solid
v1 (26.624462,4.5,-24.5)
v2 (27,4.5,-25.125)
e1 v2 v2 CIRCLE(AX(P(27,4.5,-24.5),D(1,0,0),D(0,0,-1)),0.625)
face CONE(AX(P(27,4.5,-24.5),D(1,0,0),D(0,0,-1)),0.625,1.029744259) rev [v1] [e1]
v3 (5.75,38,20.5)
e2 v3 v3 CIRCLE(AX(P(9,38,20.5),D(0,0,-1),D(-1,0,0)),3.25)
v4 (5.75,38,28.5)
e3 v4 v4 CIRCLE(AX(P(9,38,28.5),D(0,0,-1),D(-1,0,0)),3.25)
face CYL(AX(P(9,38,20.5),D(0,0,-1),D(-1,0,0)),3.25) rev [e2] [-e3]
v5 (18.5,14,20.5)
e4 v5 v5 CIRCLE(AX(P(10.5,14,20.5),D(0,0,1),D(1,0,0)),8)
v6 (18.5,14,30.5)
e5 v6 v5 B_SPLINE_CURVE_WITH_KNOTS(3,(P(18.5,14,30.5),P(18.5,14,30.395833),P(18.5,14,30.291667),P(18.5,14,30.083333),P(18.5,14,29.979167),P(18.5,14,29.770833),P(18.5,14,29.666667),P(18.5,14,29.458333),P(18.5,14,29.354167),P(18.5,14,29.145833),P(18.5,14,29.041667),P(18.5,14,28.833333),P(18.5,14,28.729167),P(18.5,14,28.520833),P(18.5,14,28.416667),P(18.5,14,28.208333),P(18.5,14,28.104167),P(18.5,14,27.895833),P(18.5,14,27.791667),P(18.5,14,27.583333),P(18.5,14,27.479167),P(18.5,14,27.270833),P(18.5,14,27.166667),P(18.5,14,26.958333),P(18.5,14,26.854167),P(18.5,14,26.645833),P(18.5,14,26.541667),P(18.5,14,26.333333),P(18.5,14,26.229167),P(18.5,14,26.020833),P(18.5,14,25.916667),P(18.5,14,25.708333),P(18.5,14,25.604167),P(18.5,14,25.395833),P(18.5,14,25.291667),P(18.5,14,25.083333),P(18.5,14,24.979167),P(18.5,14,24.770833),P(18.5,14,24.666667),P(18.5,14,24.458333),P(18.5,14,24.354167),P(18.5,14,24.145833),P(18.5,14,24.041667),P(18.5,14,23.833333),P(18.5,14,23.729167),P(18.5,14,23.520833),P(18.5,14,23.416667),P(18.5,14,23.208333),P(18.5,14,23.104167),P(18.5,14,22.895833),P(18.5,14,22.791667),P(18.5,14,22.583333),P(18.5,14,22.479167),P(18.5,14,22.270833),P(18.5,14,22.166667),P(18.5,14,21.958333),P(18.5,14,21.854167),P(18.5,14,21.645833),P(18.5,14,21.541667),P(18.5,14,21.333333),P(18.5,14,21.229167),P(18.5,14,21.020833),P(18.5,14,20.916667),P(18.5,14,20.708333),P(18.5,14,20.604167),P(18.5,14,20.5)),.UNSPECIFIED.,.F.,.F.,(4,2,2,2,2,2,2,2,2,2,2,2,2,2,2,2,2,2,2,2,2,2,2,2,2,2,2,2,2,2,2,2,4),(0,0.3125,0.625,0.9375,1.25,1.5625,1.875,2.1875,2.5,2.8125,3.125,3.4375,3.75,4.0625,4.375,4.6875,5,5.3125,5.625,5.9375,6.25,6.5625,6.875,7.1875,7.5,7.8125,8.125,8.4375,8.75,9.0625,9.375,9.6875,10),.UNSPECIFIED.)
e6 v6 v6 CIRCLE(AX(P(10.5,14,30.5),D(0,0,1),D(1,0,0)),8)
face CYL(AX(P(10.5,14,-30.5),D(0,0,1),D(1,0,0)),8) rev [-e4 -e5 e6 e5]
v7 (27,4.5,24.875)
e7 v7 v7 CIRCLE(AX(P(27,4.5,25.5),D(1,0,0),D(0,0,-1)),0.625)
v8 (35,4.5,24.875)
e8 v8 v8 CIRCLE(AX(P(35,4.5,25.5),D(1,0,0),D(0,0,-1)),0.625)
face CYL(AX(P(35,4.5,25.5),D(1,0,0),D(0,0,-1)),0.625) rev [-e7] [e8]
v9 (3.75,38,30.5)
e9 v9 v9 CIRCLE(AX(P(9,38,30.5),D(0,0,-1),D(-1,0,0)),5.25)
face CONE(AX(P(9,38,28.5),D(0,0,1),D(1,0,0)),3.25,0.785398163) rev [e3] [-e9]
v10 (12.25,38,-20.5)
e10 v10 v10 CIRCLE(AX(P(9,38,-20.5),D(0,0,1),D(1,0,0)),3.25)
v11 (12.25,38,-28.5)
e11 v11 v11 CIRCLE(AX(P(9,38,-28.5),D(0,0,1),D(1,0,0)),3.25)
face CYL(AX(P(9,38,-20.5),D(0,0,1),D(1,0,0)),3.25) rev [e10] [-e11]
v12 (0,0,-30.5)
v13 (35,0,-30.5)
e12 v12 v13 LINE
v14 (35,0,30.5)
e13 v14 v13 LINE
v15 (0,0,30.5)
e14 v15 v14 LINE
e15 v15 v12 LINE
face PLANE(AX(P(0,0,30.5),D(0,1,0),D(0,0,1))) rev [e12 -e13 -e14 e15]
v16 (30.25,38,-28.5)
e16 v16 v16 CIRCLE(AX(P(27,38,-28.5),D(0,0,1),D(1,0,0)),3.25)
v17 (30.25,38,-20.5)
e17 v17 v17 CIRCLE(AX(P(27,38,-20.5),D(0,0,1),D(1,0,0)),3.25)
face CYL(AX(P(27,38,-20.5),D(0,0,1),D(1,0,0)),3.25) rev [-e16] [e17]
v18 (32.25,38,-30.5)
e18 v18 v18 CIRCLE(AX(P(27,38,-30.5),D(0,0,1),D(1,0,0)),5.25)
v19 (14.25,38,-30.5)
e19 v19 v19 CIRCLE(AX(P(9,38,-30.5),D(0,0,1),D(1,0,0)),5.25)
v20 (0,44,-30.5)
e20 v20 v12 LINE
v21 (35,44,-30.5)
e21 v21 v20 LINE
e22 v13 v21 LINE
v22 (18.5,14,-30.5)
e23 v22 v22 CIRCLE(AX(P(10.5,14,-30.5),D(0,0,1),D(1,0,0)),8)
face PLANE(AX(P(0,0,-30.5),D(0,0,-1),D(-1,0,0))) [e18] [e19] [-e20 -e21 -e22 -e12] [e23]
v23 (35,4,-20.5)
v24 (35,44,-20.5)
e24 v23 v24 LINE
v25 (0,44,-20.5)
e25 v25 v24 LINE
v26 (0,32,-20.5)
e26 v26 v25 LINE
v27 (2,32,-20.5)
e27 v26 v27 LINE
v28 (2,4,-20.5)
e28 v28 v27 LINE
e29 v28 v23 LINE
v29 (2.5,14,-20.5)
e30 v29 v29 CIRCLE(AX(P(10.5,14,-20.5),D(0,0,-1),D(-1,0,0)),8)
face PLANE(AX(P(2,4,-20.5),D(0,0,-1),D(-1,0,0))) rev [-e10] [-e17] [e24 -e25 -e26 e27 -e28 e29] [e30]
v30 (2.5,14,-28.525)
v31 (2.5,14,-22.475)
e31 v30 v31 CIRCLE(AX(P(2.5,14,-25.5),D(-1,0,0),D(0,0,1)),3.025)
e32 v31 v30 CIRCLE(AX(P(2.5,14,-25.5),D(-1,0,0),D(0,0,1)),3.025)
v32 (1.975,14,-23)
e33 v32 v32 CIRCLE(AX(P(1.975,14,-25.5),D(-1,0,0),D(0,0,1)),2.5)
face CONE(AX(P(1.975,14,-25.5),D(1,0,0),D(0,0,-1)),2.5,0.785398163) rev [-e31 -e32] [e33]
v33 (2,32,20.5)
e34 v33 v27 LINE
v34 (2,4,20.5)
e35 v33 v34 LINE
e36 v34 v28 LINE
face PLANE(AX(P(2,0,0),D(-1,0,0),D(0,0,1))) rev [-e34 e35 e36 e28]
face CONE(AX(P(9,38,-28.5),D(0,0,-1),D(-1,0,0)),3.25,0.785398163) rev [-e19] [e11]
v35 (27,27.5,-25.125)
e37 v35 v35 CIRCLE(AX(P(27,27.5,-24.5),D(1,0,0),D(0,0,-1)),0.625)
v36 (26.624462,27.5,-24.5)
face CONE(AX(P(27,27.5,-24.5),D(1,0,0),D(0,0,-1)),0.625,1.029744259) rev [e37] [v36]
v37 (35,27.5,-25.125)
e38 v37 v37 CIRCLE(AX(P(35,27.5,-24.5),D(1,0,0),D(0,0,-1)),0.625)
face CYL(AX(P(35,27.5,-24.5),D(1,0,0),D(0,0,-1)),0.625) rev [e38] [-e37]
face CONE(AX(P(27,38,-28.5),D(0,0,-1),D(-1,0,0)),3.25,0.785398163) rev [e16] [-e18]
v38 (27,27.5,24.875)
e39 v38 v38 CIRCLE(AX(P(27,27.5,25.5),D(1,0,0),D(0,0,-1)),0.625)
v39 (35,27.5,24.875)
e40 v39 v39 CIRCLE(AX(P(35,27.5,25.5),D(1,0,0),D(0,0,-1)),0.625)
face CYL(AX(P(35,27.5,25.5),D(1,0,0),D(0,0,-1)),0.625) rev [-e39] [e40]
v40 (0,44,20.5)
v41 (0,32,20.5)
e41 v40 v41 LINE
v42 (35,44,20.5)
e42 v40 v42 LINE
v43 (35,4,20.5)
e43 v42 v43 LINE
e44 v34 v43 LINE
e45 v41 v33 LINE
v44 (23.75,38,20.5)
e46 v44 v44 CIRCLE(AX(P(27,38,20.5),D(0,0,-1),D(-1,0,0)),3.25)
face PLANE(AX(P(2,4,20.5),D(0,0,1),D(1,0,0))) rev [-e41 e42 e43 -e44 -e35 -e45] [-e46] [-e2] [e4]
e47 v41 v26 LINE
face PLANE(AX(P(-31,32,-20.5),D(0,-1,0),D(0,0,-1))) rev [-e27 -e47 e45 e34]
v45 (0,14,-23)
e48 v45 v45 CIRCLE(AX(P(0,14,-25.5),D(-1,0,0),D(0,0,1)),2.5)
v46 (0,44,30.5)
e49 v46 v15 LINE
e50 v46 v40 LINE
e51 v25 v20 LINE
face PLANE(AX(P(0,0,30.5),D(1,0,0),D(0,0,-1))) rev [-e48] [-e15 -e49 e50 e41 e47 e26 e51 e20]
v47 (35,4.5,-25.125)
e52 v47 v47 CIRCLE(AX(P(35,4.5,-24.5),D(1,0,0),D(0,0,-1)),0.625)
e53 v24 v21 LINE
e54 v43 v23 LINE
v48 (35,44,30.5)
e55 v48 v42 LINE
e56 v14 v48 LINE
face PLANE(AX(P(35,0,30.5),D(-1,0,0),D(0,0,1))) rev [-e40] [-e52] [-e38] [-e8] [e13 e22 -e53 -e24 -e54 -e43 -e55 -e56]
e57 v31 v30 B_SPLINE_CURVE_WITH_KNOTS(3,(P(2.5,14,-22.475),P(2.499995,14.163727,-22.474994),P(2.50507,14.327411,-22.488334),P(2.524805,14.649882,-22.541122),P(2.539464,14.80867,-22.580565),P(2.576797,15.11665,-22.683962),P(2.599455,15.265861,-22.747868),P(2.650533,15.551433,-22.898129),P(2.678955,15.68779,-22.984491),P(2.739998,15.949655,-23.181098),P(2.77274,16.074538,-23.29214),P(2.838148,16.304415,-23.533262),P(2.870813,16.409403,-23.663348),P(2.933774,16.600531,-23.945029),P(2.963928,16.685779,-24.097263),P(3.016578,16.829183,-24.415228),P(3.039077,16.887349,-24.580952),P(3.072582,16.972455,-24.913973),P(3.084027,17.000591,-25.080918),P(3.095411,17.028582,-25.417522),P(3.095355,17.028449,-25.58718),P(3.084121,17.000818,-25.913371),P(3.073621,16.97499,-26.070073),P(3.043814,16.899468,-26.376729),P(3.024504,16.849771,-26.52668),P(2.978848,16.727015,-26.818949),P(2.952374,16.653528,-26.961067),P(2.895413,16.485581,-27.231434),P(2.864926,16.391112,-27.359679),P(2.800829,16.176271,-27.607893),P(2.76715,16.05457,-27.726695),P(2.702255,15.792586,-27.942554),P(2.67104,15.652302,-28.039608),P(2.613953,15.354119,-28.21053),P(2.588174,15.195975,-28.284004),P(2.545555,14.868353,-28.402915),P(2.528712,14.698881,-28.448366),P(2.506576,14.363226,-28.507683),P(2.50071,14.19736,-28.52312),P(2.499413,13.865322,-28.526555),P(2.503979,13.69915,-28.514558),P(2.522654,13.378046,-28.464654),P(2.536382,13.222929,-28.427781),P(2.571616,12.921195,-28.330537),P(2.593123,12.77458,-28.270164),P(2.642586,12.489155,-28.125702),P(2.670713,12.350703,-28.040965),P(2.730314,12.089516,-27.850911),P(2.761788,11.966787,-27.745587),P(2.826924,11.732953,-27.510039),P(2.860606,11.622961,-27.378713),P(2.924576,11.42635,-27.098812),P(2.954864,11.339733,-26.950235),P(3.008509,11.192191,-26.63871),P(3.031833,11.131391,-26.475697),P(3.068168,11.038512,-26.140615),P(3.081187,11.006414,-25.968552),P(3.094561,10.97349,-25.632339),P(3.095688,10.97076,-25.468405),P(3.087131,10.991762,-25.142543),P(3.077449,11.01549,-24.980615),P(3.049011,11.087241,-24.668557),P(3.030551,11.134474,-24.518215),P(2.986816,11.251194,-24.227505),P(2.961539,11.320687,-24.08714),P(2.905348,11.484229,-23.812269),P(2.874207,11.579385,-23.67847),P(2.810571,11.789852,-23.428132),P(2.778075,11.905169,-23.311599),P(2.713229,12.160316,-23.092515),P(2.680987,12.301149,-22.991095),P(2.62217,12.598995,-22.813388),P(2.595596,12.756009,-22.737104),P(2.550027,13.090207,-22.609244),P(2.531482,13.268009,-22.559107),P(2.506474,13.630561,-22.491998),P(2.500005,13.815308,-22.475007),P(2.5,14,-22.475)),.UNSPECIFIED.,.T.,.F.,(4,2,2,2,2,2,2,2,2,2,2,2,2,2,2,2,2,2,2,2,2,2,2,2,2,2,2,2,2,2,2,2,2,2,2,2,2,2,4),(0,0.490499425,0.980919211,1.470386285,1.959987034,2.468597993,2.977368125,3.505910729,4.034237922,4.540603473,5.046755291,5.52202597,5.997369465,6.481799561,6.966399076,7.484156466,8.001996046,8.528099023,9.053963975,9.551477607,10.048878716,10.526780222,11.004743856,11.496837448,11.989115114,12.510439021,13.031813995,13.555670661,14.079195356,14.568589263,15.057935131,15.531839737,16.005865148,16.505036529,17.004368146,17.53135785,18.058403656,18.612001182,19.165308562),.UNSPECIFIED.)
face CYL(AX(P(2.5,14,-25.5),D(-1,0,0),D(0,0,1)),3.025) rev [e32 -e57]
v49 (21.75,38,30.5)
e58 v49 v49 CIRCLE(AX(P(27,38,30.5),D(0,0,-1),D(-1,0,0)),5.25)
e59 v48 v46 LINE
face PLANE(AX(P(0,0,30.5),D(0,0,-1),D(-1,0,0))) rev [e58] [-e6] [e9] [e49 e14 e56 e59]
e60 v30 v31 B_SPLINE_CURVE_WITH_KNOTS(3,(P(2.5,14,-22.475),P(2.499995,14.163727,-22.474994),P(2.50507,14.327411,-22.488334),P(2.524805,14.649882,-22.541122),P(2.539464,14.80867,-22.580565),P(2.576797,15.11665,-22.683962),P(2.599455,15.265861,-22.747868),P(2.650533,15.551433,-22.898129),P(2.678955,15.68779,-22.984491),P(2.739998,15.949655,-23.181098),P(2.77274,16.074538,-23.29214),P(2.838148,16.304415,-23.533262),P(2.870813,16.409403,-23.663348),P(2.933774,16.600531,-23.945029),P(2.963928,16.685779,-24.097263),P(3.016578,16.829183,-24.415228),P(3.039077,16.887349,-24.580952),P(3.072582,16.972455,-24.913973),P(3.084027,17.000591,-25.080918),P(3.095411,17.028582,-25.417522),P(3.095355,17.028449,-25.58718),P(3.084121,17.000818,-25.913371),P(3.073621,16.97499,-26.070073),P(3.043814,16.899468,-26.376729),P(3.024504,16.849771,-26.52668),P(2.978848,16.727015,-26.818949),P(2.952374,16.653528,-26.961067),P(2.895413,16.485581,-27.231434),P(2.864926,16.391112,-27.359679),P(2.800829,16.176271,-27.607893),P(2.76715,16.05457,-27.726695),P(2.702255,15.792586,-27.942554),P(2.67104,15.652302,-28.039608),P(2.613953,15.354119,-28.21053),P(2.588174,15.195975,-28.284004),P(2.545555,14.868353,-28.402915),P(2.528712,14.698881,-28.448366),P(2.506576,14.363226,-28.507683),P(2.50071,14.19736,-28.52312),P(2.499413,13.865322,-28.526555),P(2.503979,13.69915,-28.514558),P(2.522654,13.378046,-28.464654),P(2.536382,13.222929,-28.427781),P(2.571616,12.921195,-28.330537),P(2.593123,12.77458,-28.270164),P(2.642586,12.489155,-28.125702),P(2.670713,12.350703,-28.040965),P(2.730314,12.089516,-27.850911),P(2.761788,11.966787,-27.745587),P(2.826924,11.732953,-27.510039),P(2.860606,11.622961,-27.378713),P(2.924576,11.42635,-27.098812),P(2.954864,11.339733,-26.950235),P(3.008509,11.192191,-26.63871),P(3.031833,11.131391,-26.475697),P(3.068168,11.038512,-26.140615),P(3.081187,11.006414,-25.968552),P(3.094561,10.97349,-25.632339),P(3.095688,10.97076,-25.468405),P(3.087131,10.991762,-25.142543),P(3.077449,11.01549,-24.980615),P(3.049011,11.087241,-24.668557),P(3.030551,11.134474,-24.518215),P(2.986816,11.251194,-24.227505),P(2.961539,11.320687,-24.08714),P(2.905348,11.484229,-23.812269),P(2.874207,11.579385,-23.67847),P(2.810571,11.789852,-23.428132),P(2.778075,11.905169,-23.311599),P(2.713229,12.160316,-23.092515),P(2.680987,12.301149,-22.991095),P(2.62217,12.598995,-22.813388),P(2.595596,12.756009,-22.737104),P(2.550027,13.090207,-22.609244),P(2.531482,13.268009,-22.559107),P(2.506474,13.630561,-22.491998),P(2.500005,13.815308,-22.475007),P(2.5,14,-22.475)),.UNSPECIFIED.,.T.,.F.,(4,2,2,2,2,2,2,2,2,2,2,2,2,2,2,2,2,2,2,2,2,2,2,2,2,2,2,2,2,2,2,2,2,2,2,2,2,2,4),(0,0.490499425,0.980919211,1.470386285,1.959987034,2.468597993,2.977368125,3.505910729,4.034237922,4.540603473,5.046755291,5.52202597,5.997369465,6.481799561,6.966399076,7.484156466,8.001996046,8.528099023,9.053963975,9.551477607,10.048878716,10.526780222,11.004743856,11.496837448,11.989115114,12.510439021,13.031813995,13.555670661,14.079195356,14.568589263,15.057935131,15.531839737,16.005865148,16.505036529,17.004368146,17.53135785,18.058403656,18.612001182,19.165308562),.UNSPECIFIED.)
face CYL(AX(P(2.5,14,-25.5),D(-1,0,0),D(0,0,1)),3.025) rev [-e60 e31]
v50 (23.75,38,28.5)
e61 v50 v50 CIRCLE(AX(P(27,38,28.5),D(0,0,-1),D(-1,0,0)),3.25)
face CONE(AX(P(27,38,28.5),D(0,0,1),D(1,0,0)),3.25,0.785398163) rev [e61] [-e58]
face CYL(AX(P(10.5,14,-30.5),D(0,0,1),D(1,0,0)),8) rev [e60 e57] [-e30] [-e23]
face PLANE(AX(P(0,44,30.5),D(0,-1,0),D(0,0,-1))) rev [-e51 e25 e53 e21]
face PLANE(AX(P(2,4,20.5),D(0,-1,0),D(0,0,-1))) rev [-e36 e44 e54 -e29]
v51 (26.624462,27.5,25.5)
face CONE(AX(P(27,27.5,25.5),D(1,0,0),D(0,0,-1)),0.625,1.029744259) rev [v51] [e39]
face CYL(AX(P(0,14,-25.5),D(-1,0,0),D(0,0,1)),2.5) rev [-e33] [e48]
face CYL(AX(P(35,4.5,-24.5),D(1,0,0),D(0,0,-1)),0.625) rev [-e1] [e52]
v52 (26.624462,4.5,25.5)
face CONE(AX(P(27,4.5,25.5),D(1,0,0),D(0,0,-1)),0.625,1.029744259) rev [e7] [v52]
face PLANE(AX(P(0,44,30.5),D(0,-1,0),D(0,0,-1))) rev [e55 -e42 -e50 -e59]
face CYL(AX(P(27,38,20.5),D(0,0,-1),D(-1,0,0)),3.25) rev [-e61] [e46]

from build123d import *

# Parameters (mm, degrees)
SKETCH_1_W                       = 35
SKETCH_1_H                       = 44
EXTRUDE_1_DEPTH                  = 30.5
SKETCH_3_W                       = 41
SKETCH_3_H                       = 40
CUT_EXTRUDE_1_DEPTH              = 33
SKETCH_4_W                       = 41
SKETCH_4_H                       = 12
CUT_EXTRUDE_2_DEPTH              = 33
SKETCH_5_R                       = 8
CUT_EXTRUDE_3_DEPTH              = 83.957820608
HOLE_WIZARD_6_5_6_5_1_AT_2_COUNT = 2
HOLE_WIZARD_6_5_6_5_1_AT_2_PITCH = 18


# Read off the part's stored shape, not the designer's step: M1.6 螺纹孔1, M6 螺纹孔1
with BuildPart() as part:
    # 草图1 → 凸台-拉伸1 (new, symmetric)
    with BuildSketch(Plane.XY):
        with Locations((17.5, 22)):
            Rectangle(SKETCH_1_W, SKETCH_1_H)
    extrude(amount=EXTRUDE_1_DEPTH, both=True)

    # 草图3 → 切除-拉伸1 (cut)
    with BuildSketch(Plane(origin=(35, 0, 0), x_dir=(0, 0, -1), z_dir=(1, 0, 0))):
        with Locations((0, 24)):
            Rectangle(SKETCH_3_W, SKETCH_3_H)
    extrude(amount=-CUT_EXTRUDE_1_DEPTH, mode=Mode.SUBTRACT)

    # 草图4 → 切除-拉伸2 (cut)
    with BuildSketch(Plane(origin=(2, 0, 0), x_dir=(0, 0, -1), z_dir=(1, 0, 0))):
        with Locations((0, 38)):
            Rectangle(SKETCH_4_W, SKETCH_4_H)
    extrude(amount=-CUT_EXTRUDE_2_DEPTH, mode=Mode.SUBTRACT)

    # 草图5 → 切除-拉伸3 (cut, through all)
    with BuildSketch(Plane.XY.offset(30.5)):
        with Locations((10.5, 14)):
            Circle(SKETCH_5_R)
    extrude(amount=-CUT_EXTRUDE_3_DEPTH, mode=Mode.SUBTRACT)

    # 草图7 → Ø6.5 (6.5) 直径孔1 (revolve, cut)
    with BuildSketch(Plane(origin=(9, 38, -20.5), x_dir=(0, -1, 0), z_dir=(1, 0, 0))):
        Polygon((0, 0), (0, 10), (5.25, 10), (3.25, 8), (3.25, 0), align=None)
    hole_wizard_6_5_6_5_1 = revolve(axis=Axis((9, 38, -14.15), (0, 0, -1)), mode=Mode.SUBTRACT)

    # Ø6.5 (6.5) 直径孔1 at 2: Ø6.5 (6.5) 直径孔1 ×2
    with Locations(*[(i * HOLE_WIZARD_6_5_6_5_1_AT_2_PITCH, 0, 0) for i in range(1, HOLE_WIZARD_6_5_6_5_1_AT_2_COUNT)]):
        add(hole_wizard_6_5_6_5_1, mode=Mode.SUBTRACT)

    # 镜向1: Ø6.5 (6.5) 直径孔1 across plane
    add(hole_wizard_6_5_6_5_1.mirror(Plane.XY), mode=Mode.SUBTRACT)

    # 镜向1 copy 1 sketch → 镜向1 copy 1 (revolve, cut)
    with BuildSketch(Plane(origin=(27, 38, 20.5), x_dir=(0, -1, 0), z_dir=(1, 0, 0))):
        Polygon((0, 0), (0, -10), (5.25, -10), (3.25, -8), (3.25, 0), align=None)
    revolve(axis=Axis((27, 38, 14.15), (0, 0, -1)), mode=Mode.SUBTRACT)

    # M1.6 螺纹孔1 outline → M1.6 螺纹孔1 (revolve, cut)
    with BuildSketch(Plane(origin=(0, 27.5, 25.5), x_dir=(0, 1, 0), z_dir=(0, 0, -1))):
        Polygon((0, 35), (0, 26.624462113), (0.625, 27), (0.625, 35), align=None)
    revolve(axis=Axis((0, 27.5, 25.5), (1, 0, 0)), mode=Mode.SUBTRACT)

    # Hole Wizard M1.6 _1 2 outline → Hole Wizard M1.6 _1 2 (revolve, cut)
    with BuildSketch(Plane(origin=(0, 4.5, -24.5), x_dir=(0, 1, 0), z_dir=(0, 0, -1))):
        Polygon((0, 35), (0, 26.624462113), (0.625, 27), (0.625, 35), align=None)
    revolve(axis=Axis((0, 4.5, -24.5), (1, 0, 0)), mode=Mode.SUBTRACT)

    # Hole Wizard M1.6 _1 3 outline → Hole Wizard M1.6 _1 3 (revolve, cut)
    with BuildSketch(Plane(origin=(0, 27.5, -24.5), x_dir=(0, 1, 0), z_dir=(0, 0, -1))):
        Polygon((0, 35), (0, 26.624462113), (0.625, 27), (0.625, 35), align=None)
    revolve(axis=Axis((0, 27.5, -24.5), (1, 0, 0)), mode=Mode.SUBTRACT)

    # Hole Wizard M1.6 _1 4 outline → Hole Wizard M1.6 _1 4 (revolve, cut)
    with BuildSketch(Plane(origin=(0, 4.5, 25.5), x_dir=(0, 1, 0), z_dir=(0, 0, -1))):
        Polygon((0, 35), (0, 26.624462113), (0.625, 27), (0.625, 35), align=None)
    revolve(axis=Axis((0, 4.5, 25.5), (1, 0, 0)), mode=Mode.SUBTRACT)

    # M6 螺纹孔1 outline → M6 螺纹孔1 (revolve, cut)
    with BuildSketch(Plane(origin=(0, 14, -25.5), x_dir=(0, 1, 0), z_dir=(0, 0, -1))):
        Polygon((3.025, 2.499998942), (3.025, 3.094213479), (2.5, 3.094219892), (2.5, 1.975), align=None)
        Polygon((2.5, 1.975), (2.5, 3.094219892), (0, 3.094219892), (0, 0), (2.5, 0), align=None)
    revolve(axis=Axis((0, 14, -25.5), (1, 0, 0)), mode=Mode.SUBTRACT)


solid = part.part
